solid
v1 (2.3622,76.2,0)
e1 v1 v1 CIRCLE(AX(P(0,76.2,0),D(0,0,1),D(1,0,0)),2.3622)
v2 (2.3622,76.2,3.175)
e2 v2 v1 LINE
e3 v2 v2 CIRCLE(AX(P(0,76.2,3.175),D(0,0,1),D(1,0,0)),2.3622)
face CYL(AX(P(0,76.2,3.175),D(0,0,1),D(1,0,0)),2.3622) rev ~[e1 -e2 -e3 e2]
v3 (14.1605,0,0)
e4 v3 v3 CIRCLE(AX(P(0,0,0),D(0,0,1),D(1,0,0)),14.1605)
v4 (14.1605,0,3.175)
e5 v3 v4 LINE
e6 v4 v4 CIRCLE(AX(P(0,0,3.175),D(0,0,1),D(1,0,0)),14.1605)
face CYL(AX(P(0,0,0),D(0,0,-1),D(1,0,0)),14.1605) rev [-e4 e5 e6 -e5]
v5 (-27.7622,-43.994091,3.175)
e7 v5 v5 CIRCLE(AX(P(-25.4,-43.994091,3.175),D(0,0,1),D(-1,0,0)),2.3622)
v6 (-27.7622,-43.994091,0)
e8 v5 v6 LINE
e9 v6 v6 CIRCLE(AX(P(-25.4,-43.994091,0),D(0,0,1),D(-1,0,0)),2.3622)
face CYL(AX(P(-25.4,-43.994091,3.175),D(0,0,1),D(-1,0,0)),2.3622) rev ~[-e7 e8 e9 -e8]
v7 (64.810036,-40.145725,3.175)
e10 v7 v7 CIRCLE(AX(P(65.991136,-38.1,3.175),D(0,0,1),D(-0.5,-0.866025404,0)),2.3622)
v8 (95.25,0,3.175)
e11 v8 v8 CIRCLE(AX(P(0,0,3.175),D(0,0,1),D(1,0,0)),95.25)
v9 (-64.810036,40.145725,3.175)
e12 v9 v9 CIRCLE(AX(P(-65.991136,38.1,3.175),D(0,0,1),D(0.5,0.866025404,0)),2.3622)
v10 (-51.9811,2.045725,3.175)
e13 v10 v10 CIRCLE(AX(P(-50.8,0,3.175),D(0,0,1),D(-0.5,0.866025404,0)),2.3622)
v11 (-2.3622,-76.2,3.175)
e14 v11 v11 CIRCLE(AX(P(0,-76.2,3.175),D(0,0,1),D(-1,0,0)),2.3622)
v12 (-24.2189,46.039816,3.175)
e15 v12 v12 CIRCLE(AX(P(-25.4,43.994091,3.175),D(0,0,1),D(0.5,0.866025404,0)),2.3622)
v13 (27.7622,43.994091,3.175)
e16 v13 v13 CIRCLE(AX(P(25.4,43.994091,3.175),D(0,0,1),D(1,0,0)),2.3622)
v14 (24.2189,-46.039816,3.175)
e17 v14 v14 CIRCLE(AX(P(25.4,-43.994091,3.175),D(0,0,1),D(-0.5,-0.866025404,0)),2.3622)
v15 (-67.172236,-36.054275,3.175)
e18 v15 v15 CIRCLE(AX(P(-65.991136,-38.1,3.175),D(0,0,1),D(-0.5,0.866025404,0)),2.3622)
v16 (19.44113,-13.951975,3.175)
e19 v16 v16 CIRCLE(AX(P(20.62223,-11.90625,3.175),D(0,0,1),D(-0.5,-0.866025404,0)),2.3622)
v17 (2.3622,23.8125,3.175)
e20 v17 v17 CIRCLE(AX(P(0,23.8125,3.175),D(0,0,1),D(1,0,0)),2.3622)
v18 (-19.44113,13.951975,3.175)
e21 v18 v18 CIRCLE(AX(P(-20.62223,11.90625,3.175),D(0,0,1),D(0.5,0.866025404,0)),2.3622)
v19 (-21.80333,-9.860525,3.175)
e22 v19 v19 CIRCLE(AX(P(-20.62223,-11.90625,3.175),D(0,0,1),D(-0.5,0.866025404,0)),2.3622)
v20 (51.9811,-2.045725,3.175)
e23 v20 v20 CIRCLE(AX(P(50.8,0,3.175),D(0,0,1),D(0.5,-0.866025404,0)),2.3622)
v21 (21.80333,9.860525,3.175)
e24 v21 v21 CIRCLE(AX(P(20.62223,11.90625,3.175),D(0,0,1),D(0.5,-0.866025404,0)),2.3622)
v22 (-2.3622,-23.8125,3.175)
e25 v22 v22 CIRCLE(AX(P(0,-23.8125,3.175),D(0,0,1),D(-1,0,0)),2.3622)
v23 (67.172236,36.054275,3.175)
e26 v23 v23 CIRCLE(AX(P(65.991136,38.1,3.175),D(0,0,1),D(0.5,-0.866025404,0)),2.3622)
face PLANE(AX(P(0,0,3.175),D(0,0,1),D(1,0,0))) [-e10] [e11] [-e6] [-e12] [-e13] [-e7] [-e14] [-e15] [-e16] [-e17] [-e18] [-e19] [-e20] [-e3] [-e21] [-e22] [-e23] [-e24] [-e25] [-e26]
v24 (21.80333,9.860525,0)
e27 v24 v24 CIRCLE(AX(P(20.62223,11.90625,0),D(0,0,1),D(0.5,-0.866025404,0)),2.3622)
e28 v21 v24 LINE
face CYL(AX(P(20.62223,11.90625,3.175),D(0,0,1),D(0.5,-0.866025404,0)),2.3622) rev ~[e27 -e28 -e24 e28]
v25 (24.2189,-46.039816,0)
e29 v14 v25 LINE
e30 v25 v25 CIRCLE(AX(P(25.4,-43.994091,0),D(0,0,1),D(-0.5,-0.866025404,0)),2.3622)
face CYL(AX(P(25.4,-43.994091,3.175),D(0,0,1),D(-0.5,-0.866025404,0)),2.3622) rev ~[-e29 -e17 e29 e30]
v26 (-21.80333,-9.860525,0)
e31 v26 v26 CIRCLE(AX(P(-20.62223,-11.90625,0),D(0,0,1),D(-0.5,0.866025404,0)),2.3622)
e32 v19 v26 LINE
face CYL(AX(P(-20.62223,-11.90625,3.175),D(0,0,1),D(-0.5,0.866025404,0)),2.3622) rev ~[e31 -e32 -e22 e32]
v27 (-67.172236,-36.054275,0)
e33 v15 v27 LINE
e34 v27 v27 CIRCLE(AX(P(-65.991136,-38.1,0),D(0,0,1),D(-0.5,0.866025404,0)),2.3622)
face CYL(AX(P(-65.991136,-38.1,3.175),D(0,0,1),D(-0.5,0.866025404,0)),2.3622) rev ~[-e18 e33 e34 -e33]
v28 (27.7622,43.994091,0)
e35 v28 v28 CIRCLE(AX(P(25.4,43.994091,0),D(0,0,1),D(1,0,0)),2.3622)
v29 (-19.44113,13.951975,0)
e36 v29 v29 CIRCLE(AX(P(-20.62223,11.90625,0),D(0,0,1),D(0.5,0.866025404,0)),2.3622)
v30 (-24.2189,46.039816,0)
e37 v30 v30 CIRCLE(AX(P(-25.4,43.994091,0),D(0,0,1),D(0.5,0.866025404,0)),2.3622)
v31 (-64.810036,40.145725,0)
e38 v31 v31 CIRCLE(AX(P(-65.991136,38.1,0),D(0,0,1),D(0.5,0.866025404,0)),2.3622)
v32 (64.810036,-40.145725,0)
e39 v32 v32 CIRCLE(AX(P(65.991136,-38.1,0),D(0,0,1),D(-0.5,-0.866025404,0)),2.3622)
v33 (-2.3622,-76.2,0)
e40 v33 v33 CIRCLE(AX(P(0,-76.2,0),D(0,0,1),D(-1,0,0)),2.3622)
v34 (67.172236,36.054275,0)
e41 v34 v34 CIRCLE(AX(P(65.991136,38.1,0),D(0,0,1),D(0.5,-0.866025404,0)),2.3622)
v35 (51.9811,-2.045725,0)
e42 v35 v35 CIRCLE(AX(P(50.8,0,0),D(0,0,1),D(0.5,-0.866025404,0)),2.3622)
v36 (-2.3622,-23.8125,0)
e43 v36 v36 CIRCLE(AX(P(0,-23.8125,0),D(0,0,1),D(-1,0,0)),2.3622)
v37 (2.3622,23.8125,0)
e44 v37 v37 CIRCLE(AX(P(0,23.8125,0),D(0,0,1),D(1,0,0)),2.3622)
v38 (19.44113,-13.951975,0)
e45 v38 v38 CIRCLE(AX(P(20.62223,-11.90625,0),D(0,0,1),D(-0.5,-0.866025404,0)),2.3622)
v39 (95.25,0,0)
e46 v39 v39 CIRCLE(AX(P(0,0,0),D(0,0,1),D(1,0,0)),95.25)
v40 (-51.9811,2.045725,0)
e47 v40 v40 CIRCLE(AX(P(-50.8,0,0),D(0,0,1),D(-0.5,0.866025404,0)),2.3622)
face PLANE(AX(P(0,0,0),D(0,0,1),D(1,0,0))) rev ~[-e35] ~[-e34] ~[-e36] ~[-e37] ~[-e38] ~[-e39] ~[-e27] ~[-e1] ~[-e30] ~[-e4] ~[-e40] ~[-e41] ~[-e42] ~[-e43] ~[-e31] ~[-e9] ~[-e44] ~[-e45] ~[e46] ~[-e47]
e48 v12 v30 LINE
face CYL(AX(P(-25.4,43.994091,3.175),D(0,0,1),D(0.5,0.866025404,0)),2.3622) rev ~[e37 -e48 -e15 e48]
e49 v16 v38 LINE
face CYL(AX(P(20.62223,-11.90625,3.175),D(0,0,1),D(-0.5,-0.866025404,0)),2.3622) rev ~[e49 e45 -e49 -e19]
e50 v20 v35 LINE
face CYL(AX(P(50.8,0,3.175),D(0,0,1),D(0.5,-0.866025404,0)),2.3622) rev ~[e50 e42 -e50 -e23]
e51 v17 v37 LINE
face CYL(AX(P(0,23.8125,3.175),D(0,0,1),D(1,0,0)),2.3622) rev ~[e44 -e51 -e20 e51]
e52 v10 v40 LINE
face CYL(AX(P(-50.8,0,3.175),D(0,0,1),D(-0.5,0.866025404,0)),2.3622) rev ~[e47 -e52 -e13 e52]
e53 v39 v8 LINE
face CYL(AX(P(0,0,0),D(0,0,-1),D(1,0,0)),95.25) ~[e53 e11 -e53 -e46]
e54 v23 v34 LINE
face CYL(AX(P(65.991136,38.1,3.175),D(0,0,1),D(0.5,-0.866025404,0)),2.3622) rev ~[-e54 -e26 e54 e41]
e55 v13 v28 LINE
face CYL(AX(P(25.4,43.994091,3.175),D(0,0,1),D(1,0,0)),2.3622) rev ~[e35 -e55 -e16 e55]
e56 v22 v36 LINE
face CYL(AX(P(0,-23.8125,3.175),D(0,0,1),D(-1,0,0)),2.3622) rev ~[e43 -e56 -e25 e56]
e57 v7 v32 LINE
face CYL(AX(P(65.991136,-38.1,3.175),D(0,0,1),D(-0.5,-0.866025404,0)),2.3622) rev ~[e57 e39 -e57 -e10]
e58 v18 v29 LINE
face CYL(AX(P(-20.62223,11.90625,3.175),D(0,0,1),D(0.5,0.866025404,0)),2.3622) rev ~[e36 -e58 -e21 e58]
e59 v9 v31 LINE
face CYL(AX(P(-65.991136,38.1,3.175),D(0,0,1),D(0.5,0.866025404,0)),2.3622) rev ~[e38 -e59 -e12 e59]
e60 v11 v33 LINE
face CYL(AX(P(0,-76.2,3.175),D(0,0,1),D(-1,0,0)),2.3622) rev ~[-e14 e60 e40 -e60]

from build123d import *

# Parameters (mm, degrees)
F0_R            = 95.25
F0_R_2          = 14.1605
F1_DEPTH        = 3.175
F2_R            = 2.3622
F3_DEPTH        = 3.176
F3_COPIES_COUNT = 6


# Not quite as in the source:
# - a pattern or mirror of a feature is missing from the dataset's text; its kind, count and spacing are read off the source's solid


with BuildPart() as f1:
    # F0 (on Top) → F1 (new body)
    with BuildSketch(Plane.XY):
        Circle(F0_R)
        Circle(F0_R_2, mode=Mode.SUBTRACT)
    extrude(amount=F1_DEPTH)

    # F2 (on face) → F3 (cut, through all)
    with BuildSketch(Plane.XY.offset(3.175)):
        with Locations((0, 23.8125)):
            Circle(F2_R)
        with Locations((0, 76.2)):
            Circle(F2_R)
        with Locations((25.4, 43.9940905122)):
            Circle(F2_R)
    f3 = extrude(amount=-F3_DEPTH, mode=Mode.SUBTRACT)

    # F3_copies: F3 ×6 about axis
    f3_copies_axis = Axis((0, 0, 0), (0, 0, 1))
    for i in range(1, F3_COPIES_COUNT):
        add(f3.rotate(f3_copies_axis, i * 360 / F3_COPIES_COUNT), mode=Mode.SUBTRACT)


solid = f1.part
